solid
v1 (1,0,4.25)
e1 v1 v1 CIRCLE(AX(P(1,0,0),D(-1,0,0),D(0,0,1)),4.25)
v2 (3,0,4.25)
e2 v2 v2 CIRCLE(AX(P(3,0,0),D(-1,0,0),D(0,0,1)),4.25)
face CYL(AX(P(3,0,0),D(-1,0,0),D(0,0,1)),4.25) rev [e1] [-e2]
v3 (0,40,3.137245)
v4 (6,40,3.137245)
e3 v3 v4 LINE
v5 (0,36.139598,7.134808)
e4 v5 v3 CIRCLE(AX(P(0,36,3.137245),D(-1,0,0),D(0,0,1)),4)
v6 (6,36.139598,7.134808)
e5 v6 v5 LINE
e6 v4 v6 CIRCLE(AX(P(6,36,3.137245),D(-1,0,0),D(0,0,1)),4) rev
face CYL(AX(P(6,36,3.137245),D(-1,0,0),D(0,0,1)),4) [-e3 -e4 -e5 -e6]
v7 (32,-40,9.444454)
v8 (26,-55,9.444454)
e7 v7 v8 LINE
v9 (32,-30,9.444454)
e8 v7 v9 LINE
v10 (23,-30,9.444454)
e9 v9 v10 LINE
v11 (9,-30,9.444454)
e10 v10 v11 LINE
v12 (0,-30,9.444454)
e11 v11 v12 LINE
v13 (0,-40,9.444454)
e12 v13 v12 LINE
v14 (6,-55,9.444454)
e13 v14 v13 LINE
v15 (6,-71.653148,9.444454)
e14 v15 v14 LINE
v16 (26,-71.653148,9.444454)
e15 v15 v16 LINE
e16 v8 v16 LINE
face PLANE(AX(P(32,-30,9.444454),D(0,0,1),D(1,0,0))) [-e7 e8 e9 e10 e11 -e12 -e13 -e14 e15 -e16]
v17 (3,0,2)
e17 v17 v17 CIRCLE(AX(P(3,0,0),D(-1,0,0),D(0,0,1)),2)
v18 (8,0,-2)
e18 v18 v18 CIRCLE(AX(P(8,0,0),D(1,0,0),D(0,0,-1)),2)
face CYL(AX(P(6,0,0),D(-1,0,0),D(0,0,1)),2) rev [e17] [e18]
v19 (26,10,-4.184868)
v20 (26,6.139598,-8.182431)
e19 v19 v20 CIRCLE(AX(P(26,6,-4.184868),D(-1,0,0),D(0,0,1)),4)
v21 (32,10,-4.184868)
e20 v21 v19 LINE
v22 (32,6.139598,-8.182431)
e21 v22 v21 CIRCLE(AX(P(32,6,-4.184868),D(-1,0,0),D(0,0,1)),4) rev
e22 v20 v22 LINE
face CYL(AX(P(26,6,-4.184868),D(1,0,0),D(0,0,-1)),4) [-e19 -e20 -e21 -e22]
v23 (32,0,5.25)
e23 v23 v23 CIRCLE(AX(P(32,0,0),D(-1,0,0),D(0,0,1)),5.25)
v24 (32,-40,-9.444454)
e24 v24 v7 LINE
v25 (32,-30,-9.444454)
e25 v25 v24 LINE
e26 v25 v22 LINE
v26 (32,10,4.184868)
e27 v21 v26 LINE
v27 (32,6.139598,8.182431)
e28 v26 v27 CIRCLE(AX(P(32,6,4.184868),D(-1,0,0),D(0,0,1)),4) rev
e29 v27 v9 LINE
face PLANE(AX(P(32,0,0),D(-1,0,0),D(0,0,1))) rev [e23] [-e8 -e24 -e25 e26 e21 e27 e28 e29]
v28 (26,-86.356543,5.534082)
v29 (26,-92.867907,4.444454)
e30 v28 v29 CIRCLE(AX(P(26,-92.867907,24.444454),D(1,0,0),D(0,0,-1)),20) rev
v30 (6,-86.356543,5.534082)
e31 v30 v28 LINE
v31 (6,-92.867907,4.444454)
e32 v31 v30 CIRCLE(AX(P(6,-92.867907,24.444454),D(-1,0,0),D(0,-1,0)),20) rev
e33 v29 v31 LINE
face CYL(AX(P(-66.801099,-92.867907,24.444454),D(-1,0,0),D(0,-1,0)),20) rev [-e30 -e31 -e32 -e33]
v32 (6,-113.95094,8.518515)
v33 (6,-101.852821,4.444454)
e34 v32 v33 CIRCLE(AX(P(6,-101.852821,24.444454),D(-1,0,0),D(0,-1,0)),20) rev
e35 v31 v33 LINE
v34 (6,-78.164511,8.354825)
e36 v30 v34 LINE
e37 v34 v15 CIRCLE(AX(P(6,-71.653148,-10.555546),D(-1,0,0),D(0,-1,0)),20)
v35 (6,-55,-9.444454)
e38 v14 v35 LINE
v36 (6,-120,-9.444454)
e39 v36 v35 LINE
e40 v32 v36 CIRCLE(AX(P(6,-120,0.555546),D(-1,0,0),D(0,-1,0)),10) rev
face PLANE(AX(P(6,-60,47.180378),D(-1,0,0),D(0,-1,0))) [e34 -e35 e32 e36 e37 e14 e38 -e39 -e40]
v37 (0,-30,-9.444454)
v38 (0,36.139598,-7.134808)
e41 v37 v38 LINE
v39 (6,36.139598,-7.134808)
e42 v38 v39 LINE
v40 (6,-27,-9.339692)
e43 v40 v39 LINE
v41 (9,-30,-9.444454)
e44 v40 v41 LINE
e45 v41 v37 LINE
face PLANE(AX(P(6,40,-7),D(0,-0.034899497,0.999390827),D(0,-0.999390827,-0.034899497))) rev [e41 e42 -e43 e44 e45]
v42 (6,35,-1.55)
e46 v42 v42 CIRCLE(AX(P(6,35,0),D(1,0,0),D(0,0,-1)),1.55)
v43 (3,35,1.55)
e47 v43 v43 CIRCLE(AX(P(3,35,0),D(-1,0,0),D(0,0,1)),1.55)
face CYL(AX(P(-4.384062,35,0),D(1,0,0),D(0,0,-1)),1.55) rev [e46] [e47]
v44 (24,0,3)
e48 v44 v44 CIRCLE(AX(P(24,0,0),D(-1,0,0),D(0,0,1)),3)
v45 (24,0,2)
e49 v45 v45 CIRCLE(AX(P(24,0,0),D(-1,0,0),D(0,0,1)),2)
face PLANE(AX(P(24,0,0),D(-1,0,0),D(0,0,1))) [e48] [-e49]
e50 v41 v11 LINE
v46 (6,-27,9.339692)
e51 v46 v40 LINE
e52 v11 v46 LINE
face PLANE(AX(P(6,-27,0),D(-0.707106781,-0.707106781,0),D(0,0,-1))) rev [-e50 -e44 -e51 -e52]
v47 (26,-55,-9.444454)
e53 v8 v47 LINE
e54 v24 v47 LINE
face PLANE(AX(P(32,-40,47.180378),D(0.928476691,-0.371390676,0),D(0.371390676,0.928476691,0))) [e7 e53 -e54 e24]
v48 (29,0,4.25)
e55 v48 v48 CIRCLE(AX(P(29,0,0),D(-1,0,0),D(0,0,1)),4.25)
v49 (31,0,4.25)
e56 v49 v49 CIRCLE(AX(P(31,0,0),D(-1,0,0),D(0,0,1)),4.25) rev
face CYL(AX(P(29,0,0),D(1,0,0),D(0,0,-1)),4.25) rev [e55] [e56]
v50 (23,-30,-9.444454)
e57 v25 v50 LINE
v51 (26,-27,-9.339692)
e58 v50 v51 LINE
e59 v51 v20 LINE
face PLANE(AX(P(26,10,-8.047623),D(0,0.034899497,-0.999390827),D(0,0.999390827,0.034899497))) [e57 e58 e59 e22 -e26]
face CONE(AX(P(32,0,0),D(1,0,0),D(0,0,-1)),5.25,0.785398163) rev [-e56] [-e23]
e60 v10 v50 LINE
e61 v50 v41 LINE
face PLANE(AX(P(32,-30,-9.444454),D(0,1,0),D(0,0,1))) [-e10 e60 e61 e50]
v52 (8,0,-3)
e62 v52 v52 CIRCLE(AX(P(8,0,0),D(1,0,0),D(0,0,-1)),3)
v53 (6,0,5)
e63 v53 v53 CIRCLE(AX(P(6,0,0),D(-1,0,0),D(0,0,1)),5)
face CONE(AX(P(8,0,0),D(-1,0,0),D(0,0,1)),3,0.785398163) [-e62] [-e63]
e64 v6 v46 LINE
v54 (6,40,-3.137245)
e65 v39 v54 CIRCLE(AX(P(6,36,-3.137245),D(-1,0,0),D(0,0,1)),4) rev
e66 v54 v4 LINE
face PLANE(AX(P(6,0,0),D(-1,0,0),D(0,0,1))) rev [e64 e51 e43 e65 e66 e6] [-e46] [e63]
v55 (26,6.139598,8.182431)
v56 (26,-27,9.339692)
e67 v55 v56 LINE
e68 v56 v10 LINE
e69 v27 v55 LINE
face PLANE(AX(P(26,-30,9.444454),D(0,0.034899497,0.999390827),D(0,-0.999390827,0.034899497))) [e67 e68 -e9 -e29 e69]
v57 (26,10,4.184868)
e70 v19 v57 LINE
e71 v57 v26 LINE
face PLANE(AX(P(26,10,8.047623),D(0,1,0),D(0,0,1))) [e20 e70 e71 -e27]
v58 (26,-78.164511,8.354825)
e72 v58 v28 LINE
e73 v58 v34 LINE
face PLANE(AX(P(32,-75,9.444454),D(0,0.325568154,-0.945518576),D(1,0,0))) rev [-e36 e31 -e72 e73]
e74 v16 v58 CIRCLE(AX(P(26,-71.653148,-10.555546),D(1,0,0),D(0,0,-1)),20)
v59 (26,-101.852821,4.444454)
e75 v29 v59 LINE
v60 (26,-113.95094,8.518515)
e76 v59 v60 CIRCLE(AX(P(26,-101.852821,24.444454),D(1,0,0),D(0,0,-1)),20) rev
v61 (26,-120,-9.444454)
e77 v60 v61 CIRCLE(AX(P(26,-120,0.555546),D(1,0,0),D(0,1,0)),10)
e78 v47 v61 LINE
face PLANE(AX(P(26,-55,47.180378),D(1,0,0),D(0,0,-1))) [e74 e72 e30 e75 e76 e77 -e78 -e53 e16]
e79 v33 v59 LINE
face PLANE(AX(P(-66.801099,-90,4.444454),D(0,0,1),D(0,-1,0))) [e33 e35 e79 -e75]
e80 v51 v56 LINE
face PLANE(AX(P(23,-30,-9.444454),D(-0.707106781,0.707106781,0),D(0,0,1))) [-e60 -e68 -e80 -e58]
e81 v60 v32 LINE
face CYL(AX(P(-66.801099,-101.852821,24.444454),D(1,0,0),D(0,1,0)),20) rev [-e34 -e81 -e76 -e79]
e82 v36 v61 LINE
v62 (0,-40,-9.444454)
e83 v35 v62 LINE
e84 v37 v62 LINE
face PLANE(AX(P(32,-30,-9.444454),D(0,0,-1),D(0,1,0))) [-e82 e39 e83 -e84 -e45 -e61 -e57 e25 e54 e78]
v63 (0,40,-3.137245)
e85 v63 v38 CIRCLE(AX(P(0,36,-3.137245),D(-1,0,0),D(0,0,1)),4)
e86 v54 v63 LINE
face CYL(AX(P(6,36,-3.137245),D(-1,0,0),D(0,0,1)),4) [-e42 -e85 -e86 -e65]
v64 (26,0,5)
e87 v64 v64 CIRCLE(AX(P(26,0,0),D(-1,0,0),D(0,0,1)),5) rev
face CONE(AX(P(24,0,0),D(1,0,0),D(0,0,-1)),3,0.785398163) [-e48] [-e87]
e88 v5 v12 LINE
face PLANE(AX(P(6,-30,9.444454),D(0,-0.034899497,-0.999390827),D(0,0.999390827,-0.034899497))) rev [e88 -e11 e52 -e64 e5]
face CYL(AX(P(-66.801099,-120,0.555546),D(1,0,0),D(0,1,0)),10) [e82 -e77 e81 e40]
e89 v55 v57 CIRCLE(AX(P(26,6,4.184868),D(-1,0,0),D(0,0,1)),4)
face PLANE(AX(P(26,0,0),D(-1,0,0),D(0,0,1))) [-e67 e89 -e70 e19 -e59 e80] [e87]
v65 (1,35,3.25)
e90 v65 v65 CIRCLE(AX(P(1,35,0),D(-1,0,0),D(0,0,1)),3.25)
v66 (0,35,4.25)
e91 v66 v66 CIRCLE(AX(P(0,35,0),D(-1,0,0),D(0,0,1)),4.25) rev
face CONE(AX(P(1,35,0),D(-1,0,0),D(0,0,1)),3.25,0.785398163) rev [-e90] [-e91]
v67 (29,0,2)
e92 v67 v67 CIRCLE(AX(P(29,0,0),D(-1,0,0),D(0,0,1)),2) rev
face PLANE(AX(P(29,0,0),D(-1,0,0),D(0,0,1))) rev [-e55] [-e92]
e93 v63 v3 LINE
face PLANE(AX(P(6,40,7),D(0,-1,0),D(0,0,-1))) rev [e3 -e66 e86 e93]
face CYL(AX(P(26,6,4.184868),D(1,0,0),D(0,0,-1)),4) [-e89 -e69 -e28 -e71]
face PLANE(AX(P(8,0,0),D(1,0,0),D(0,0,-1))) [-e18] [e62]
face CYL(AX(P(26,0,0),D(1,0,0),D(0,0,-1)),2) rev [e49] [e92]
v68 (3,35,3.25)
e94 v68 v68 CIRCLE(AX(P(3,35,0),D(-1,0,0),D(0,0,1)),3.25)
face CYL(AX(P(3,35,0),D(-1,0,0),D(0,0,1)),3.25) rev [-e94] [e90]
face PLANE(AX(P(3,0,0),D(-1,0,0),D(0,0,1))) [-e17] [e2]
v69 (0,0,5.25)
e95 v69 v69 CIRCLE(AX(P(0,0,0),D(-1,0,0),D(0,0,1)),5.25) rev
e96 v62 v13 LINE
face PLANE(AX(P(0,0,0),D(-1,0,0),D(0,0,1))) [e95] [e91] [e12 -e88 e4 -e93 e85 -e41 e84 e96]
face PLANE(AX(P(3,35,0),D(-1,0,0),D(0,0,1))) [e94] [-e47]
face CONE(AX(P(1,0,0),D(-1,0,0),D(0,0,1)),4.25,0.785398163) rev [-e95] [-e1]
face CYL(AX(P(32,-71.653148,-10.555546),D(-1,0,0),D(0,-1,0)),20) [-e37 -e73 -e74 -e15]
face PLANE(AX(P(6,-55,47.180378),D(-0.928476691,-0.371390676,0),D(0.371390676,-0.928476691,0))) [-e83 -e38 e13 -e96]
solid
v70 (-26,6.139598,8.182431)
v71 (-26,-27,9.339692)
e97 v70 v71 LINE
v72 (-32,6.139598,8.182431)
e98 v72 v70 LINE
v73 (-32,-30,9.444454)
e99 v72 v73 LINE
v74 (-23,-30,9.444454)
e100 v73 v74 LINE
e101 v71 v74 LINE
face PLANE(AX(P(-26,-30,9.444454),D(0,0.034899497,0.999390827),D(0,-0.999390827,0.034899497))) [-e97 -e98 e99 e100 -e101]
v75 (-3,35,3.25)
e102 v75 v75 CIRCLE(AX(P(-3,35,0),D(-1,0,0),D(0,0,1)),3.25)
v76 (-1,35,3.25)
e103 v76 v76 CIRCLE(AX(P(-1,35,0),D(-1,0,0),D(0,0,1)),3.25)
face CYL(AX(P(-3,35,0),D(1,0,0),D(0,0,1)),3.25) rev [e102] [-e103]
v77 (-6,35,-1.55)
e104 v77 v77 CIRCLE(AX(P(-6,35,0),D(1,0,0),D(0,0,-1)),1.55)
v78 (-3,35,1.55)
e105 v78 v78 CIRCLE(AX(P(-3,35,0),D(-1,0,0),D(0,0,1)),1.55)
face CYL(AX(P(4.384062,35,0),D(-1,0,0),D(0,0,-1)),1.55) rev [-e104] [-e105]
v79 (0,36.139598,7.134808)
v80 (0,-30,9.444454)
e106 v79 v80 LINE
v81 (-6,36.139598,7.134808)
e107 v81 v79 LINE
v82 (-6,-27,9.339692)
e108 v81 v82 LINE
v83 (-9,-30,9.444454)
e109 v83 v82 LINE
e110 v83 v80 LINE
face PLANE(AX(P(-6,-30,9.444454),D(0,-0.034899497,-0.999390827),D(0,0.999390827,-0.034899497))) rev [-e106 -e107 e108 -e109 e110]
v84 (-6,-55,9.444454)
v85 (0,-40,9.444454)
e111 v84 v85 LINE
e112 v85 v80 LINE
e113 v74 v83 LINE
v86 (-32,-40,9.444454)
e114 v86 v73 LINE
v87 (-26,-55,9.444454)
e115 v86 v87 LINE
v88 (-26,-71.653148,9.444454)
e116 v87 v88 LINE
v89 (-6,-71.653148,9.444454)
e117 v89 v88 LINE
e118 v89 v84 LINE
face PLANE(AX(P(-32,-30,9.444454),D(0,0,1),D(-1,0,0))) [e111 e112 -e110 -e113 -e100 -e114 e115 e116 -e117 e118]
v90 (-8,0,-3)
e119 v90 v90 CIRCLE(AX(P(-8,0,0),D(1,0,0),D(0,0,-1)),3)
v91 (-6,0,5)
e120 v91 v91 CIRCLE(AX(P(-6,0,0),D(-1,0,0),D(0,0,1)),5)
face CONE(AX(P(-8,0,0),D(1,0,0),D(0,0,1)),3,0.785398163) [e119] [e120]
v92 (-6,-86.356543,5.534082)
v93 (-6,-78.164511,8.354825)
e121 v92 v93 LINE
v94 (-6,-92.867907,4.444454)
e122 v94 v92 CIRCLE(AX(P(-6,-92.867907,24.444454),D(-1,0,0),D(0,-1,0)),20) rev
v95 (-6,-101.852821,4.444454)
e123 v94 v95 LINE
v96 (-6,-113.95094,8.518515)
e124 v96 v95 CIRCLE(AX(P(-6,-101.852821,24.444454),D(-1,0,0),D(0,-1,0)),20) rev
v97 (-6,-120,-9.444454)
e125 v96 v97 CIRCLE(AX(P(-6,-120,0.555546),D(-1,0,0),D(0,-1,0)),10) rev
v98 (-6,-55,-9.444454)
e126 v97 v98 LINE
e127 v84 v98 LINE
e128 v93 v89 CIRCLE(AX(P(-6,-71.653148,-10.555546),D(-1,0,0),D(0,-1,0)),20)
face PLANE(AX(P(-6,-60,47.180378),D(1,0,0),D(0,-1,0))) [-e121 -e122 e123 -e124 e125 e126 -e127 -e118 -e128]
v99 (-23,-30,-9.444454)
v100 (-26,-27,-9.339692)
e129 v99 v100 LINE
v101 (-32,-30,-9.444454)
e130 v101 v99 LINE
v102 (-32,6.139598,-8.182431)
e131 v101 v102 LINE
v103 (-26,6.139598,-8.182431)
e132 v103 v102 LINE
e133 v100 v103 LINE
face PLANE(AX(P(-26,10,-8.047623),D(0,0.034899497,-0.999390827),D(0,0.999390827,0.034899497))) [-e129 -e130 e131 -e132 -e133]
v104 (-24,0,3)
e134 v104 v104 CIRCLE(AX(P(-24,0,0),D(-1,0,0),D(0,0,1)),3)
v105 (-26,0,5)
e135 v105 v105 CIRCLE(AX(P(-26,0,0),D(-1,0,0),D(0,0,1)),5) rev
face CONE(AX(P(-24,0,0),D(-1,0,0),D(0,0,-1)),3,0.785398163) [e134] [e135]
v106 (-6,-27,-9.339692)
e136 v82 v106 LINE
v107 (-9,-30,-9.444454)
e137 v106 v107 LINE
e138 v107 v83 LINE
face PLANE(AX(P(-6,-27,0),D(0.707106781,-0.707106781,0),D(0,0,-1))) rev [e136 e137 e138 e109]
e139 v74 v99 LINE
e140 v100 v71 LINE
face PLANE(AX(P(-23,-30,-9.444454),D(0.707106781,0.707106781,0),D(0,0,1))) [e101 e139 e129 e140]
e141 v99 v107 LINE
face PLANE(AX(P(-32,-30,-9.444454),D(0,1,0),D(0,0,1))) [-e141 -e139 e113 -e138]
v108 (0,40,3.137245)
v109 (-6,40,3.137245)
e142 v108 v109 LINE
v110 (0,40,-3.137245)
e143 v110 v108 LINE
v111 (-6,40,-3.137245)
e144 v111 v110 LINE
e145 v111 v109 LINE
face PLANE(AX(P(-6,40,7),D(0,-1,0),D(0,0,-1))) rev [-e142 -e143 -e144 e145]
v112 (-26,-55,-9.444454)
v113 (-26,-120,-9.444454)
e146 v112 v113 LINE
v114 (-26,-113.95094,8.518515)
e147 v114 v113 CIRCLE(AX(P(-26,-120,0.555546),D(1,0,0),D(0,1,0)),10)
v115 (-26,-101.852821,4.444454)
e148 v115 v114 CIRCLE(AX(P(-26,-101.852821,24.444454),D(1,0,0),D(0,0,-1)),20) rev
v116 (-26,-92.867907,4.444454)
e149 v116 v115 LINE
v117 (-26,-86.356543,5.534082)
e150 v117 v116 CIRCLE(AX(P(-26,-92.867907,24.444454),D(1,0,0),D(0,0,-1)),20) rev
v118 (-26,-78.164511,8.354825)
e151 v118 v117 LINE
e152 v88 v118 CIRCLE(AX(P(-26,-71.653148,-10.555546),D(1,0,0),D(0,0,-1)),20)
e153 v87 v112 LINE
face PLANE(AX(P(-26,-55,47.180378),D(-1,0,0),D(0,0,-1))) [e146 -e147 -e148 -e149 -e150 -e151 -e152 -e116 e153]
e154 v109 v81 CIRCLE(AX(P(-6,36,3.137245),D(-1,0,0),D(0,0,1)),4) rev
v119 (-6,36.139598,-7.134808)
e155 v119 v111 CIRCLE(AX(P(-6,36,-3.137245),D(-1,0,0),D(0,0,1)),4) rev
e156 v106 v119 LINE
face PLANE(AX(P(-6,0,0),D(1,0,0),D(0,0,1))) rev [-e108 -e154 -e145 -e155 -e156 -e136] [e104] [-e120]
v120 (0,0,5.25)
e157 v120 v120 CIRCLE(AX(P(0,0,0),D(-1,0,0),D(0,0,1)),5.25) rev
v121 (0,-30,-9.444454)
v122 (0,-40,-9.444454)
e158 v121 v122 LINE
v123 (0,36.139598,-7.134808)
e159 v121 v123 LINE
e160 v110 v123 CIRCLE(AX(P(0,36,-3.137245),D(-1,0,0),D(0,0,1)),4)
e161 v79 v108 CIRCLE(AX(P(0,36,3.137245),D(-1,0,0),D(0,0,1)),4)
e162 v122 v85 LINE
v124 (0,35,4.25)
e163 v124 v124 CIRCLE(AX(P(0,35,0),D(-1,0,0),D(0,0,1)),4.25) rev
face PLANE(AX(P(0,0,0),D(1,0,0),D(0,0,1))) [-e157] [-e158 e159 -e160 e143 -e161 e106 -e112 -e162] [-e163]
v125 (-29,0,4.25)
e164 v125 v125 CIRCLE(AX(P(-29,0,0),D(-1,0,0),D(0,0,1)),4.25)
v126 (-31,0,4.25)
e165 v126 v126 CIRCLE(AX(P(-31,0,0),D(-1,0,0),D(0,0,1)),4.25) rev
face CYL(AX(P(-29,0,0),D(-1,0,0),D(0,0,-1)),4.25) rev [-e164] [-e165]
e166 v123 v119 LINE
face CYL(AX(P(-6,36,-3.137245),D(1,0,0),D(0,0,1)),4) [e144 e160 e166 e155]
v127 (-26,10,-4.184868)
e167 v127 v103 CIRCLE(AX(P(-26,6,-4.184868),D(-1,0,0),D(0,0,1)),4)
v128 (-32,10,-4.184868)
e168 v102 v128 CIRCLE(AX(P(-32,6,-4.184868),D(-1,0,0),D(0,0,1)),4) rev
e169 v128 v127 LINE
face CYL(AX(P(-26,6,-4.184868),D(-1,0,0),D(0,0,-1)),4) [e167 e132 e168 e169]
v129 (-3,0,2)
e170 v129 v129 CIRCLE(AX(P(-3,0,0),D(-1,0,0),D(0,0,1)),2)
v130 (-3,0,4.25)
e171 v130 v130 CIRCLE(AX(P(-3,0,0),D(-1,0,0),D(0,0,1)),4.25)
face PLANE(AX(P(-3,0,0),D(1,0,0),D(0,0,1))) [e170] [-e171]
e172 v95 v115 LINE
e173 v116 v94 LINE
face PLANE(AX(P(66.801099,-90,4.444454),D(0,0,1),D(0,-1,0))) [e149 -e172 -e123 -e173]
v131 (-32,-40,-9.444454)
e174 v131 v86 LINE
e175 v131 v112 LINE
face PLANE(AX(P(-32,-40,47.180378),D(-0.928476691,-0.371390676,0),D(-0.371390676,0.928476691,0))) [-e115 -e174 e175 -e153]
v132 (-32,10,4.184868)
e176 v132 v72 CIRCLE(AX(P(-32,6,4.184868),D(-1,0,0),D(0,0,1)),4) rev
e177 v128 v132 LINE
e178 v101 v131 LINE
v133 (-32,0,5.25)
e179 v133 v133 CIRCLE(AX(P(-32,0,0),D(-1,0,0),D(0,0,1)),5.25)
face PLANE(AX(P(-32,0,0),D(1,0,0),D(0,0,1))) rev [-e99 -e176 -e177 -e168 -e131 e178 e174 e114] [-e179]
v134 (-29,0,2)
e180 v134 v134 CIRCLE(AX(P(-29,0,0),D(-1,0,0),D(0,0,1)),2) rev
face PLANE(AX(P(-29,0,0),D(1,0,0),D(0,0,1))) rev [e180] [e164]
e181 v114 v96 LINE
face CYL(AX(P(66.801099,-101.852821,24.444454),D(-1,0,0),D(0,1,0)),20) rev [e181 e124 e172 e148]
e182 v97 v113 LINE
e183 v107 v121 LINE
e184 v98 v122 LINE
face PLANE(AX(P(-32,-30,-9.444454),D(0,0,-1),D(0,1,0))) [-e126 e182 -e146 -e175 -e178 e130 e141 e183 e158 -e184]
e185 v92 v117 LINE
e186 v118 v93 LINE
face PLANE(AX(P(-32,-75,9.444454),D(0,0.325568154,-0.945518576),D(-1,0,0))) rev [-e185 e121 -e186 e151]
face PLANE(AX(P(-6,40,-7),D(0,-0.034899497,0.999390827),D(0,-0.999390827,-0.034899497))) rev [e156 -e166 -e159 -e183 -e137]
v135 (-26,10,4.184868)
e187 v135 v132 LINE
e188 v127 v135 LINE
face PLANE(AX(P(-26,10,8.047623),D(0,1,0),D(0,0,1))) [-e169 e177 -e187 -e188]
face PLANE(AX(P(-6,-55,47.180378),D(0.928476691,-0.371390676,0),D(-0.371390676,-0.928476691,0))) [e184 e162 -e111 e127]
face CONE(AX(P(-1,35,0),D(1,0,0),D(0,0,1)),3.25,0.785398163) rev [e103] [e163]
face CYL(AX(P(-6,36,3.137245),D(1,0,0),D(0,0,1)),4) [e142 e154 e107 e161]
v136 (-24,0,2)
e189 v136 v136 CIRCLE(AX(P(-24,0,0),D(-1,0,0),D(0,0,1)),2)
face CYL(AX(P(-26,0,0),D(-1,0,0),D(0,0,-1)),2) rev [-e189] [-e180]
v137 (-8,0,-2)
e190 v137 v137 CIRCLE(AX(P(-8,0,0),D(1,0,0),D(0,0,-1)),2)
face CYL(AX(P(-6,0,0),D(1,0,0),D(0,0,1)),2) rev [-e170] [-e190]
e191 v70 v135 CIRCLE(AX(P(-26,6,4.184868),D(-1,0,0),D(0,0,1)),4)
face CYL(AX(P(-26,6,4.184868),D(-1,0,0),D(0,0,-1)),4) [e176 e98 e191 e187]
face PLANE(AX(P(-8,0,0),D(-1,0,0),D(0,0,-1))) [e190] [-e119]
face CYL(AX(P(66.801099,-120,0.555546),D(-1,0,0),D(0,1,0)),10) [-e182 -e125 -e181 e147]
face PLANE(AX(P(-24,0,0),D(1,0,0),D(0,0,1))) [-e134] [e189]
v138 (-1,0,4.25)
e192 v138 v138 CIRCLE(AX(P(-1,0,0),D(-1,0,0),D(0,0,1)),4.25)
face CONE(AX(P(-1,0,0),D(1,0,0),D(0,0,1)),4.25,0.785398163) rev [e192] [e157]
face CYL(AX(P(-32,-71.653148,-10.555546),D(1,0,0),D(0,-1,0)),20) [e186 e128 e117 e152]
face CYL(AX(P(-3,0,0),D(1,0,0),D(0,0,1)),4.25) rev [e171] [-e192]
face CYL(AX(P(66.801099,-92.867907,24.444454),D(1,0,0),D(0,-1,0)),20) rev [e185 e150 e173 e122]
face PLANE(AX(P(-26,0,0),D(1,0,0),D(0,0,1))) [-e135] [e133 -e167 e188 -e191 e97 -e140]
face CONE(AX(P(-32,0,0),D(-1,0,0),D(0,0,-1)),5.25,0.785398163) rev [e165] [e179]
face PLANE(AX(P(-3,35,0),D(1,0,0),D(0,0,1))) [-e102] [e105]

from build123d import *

# Parameters (mm, degrees)
SKETCH1_R           = 2
BOSS_EXTRUDE1_DEPTH = 6
SKETCH2_R           = 4.25
CUT_EXTRUDE1_DEPTH  = 3
SKETCH3_W           = 18.888907728
SKETCH3_H           = 10
BOSS_EXTRUDE2_DEPTH = 32
BOSS_EXTRUDE3_START = -6
SKETCH4_R           = 2
BOSS_EXTRUDE3_DEPTH = 6
FILLET1_R           = 4
CUT_EXTRUDE2_START  = -29
SKETCH2_2_R         = 4.25
CUT_EXTRUDE2_DEPTH  = 3
CHAMFER1_SIZE       = 1
CHAMFER2_SIZE       = 3
SKETCH5_R           = 3
SKETCH5_R_2         = 2
BOSS_EXTRUDE4_DEPTH = 2
BOSS_EXTRUDE5_START = 18
SKETCH5_2_R         = 3
SKETCH5_2_R_2       = 2
BOSS_EXTRUDE5_DEPTH = 2
CHAMFER4_SIZE       = 2
BOSS_EXTRUDE6_DEPTH = 18.888907729
BOSS_EXTRUDE7_DEPTH = 20
CHAMFER5_SIZE       = 15
CHAMFER5_SIZE_2     = 5.164914199
FILLET2_R           = 20
SKETCH9_R           = 1.55
CUT_EXTRUDE3_DEPTH  = 6
CUT_EXTRUDE4_START  = -3
SKETCH10_R          = 3.25
SKETCH10_R_2        = 1.55
CUT_EXTRUDE4_DEPTH  = 3
CHAMFER6_SIZE       = 1


# Some blends are built 0.0001 mm under size
with BuildPart() as part:
    # Sketch1 → Boss-Extrude1 (new body)
    with BuildSketch(Plane(origin=(0, 0, 0), x_dir=(0, 0, -1), z_dir=(1, 0, 0))):
        Polygon((-9.444453864, -30), (-7, 40), (7, 40), (9.444453864, -30), align=None)
        Circle(SKETCH1_R, mode=Mode.SUBTRACT)
    extrude(amount=BOSS_EXTRUDE1_DEPTH)

    # Sketch2 → Cut-Extrude1 (cut)
    with BuildSketch(Plane.ZY):
        Circle(SKETCH2_R)
    extrude(amount=-CUT_EXTRUDE1_DEPTH, mode=Mode.SUBTRACT)

    # Sketch3 → Boss-Extrude2 (add)
    with BuildSketch(Plane.ZY):
        with Locations((0, -35)):
            Rectangle(SKETCH3_W, SKETCH3_H)
    extrude(amount=-BOSS_EXTRUDE2_DEPTH)

    # Sketch4 → Boss-Extrude3 (add)
    with BuildSketch(Plane(origin=(32, 0, 0), x_dir=(0, 0, -1), z_dir=(1, 0, 0)).offset(BOSS_EXTRUDE3_START)):
        Polygon((9.444453864, -30), (-9.444453864, -30), (-8.047623085, 10), (8.047623085, 10), align=None)
        with Locations(Location((0, 0, 0), (0, 0, 180))):
            Circle(SKETCH4_R, mode=Mode.SUBTRACT)
    extrude(amount=BOSS_EXTRUDE3_DEPTH)

    # Fillet1
    fillet1_edges = [part.edges().sort_by_distance(p)[0] for p in [
        (29, 10, -8.047623085),
        (29, 10, 8.047623085),
        (3, 40, 7),
        (3, 40, -7),
    ]]
    fillet(fillet1_edges, radius=FILLET1_R)

    # Sketch2<2> → Cut-Extrude2 (cut)
    with BuildSketch(Plane.ZY.offset(CUT_EXTRUDE2_START)):
        Circle(SKETCH2_2_R)
    extrude(amount=-CUT_EXTRUDE2_DEPTH, mode=Mode.SUBTRACT)

    # Chamfer1
    chamfer1_edges = [part.edges().sort_by_distance(p)[0] for p in [
        (0, 0, -4.25),
        (32, 0, -4.25),
    ]]
    chamfer(chamfer1_edges, length=CHAMFER1_SIZE)

    # Chamfer2
    chamfer2_edges = [part.edges().sort_by_distance(p)[0] for p in [
        (26, -30, 0),
        (6, -30, 0),
    ]]
    chamfer(chamfer2_edges, length=CHAMFER2_SIZE)

    # Sketch5 → Boss-Extrude4 (add)
    with BuildSketch(Plane(origin=(6, 0, 0), x_dir=(0, 0, -1), z_dir=(1, 0, 0))):
        with Locations(Location((0, 0, 0), (0, 0, 180))):
            Circle(SKETCH5_R)
        with Locations(Location((0, 0, 0), (0, 0, 180))):
            Circle(SKETCH5_R_2, mode=Mode.SUBTRACT)
    extrude(amount=BOSS_EXTRUDE4_DEPTH)

    # Sketch5<2> → Boss-Extrude5 (add)
    with BuildSketch(Plane(origin=(6, 0, 0), x_dir=(0, 0, -1), z_dir=(1, 0, 0)).offset(BOSS_EXTRUDE5_START)):
        with Locations(Location((0, 0, 0), (0, 0, 180))):
            Circle(SKETCH5_2_R)
        with Locations(Location((0, 0, 0), (0, 0, 180))):
            Circle(SKETCH5_2_R_2, mode=Mode.SUBTRACT)
    extrude(amount=BOSS_EXTRUDE5_DEPTH)

    # Chamfer4
    chamfer4_edges = [part.edges().sort_by_distance(p)[0] for p in [
        (6, 0, -3),
        (26, 0, -3),
    ]]
    chamfer(chamfer4_edges, length=CHAMFER4_SIZE - 0.0001)  # a hair under: the kernel refuses the full size

    # Sketch7 → Boss-Extrude6 (add)
    with BuildSketch(Plane(origin=(0, 0, -9.444453864), x_dir=(-1, 0, 0), z_dir=(0, 0, -1))):
        Polygon((-32, -40), (-26, -55), (-26, -60), (-6, -60), (-6, -55), (0, -40), align=None)
    extrude(amount=-BOSS_EXTRUDE6_DEPTH)

    # Sketch8 → Boss-Extrude7 (add)
    with BuildSketch(Plane(origin=(26, 0, 0), x_dir=(0, 0, -1), z_dir=(1, 0, 0))):
        with BuildLine():
            Line((9.444453864, -60), (-9.444453864, -60))
            Line((-9.444453864, -60), (-9.444453864, -90))
            Line((-9.444453864, -90), (-4.444453864, -90))
            Line((-4.444453864, -90), (-4.444453864, -110.787161313))
            ThreePointArc((-4.444453864, -110.787161313), (-6.083245599, -128.333338985), (9.444453864, -120))
            Line((9.444453864, -120), (9.444453864, -60))
        make_face()
    extrude(amount=-BOSS_EXTRUDE7_DEPTH)

    # Chamfer5
    # the kernel refuses this chamfer: 15, 5.164914199 mm, written as the material it takes off along each edge
    with BuildSketch(Plane(origin=(64.9213417, -90, 9.444453864), x_dir=(0, 0.9999212813122312, 0.012547158200392249), z_dir=(-1, 0, 0))) as chamfer5_piece_1_section:
        Polygon((CHAMFER5_SIZE * 0.999921281312, CHAMFER5_SIZE * 0.0125471582004), (-CHAMFER5_SIZE_2 * 0.0125471582012, CHAMFER5_SIZE_2 * 0.999921281379), (0, 0), align=None)
    chamfer5_piece_1 = extrude(amount=97.842683401, mode=Mode.PRIVATE)
    chamfer5_piece_1 = split(chamfer5_piece_1, bisect_by=Plane(origin=(16, -84.819367326, 4.444453864), z_dir=(0, 0, 1)), keep=Keep.TOP, mode=Mode.PRIVATE)
    add(chamfer5_piece_1, mode=Mode.SUBTRACT)

    # Fillet2
    fillet2_edges = [part.edges().sort_by_distance(p)[0] for p in [
        (16, -110.787161313, 4.444453864),
        (16, -75, 9.444453864),
        (16, -89.521054388, 4.444453864),
    ]]
    fillet(fillet2_edges, radius=FILLET2_R)

    # Sketch9 → Cut-Extrude3 (cut)
    with BuildSketch(Plane(origin=(6, 0, 0), x_dir=(0, 0, -1), z_dir=(1, 0, 0))):
        with Locations((0, 35)):
            Circle(SKETCH9_R)
    extrude(amount=-CUT_EXTRUDE3_DEPTH, mode=Mode.SUBTRACT)

    # Sketch10 → Cut-Extrude4 (cut)
    with BuildSketch(Plane.ZY.offset(CUT_EXTRUDE4_START)):
        with Locations((0, 35)):
            Circle(SKETCH10_R)
        with Locations(Location((0, 35, 0), (0, 0, 180))):
            Circle(SKETCH10_R_2, mode=Mode.SUBTRACT)
    extrude(amount=CUT_EXTRUDE4_DEPTH, mode=Mode.SUBTRACT)

    # Chamfer6
    chamfer6_edges = [part.edges().sort_by_distance(p)[0] for p in [
        (0, 35, -3.25),
    ]]
    chamfer(chamfer6_edges, length=CHAMFER6_SIZE)


with BuildPart() as body_2:
    # Mirror1: mirrored copy
    add(part.part.mirror(Plane(origin=(0, 0, 0), x_dir=(0, 0, 1), z_dir=(1, 0, 0))))


solid = Compound([part.part, body_2.part])
